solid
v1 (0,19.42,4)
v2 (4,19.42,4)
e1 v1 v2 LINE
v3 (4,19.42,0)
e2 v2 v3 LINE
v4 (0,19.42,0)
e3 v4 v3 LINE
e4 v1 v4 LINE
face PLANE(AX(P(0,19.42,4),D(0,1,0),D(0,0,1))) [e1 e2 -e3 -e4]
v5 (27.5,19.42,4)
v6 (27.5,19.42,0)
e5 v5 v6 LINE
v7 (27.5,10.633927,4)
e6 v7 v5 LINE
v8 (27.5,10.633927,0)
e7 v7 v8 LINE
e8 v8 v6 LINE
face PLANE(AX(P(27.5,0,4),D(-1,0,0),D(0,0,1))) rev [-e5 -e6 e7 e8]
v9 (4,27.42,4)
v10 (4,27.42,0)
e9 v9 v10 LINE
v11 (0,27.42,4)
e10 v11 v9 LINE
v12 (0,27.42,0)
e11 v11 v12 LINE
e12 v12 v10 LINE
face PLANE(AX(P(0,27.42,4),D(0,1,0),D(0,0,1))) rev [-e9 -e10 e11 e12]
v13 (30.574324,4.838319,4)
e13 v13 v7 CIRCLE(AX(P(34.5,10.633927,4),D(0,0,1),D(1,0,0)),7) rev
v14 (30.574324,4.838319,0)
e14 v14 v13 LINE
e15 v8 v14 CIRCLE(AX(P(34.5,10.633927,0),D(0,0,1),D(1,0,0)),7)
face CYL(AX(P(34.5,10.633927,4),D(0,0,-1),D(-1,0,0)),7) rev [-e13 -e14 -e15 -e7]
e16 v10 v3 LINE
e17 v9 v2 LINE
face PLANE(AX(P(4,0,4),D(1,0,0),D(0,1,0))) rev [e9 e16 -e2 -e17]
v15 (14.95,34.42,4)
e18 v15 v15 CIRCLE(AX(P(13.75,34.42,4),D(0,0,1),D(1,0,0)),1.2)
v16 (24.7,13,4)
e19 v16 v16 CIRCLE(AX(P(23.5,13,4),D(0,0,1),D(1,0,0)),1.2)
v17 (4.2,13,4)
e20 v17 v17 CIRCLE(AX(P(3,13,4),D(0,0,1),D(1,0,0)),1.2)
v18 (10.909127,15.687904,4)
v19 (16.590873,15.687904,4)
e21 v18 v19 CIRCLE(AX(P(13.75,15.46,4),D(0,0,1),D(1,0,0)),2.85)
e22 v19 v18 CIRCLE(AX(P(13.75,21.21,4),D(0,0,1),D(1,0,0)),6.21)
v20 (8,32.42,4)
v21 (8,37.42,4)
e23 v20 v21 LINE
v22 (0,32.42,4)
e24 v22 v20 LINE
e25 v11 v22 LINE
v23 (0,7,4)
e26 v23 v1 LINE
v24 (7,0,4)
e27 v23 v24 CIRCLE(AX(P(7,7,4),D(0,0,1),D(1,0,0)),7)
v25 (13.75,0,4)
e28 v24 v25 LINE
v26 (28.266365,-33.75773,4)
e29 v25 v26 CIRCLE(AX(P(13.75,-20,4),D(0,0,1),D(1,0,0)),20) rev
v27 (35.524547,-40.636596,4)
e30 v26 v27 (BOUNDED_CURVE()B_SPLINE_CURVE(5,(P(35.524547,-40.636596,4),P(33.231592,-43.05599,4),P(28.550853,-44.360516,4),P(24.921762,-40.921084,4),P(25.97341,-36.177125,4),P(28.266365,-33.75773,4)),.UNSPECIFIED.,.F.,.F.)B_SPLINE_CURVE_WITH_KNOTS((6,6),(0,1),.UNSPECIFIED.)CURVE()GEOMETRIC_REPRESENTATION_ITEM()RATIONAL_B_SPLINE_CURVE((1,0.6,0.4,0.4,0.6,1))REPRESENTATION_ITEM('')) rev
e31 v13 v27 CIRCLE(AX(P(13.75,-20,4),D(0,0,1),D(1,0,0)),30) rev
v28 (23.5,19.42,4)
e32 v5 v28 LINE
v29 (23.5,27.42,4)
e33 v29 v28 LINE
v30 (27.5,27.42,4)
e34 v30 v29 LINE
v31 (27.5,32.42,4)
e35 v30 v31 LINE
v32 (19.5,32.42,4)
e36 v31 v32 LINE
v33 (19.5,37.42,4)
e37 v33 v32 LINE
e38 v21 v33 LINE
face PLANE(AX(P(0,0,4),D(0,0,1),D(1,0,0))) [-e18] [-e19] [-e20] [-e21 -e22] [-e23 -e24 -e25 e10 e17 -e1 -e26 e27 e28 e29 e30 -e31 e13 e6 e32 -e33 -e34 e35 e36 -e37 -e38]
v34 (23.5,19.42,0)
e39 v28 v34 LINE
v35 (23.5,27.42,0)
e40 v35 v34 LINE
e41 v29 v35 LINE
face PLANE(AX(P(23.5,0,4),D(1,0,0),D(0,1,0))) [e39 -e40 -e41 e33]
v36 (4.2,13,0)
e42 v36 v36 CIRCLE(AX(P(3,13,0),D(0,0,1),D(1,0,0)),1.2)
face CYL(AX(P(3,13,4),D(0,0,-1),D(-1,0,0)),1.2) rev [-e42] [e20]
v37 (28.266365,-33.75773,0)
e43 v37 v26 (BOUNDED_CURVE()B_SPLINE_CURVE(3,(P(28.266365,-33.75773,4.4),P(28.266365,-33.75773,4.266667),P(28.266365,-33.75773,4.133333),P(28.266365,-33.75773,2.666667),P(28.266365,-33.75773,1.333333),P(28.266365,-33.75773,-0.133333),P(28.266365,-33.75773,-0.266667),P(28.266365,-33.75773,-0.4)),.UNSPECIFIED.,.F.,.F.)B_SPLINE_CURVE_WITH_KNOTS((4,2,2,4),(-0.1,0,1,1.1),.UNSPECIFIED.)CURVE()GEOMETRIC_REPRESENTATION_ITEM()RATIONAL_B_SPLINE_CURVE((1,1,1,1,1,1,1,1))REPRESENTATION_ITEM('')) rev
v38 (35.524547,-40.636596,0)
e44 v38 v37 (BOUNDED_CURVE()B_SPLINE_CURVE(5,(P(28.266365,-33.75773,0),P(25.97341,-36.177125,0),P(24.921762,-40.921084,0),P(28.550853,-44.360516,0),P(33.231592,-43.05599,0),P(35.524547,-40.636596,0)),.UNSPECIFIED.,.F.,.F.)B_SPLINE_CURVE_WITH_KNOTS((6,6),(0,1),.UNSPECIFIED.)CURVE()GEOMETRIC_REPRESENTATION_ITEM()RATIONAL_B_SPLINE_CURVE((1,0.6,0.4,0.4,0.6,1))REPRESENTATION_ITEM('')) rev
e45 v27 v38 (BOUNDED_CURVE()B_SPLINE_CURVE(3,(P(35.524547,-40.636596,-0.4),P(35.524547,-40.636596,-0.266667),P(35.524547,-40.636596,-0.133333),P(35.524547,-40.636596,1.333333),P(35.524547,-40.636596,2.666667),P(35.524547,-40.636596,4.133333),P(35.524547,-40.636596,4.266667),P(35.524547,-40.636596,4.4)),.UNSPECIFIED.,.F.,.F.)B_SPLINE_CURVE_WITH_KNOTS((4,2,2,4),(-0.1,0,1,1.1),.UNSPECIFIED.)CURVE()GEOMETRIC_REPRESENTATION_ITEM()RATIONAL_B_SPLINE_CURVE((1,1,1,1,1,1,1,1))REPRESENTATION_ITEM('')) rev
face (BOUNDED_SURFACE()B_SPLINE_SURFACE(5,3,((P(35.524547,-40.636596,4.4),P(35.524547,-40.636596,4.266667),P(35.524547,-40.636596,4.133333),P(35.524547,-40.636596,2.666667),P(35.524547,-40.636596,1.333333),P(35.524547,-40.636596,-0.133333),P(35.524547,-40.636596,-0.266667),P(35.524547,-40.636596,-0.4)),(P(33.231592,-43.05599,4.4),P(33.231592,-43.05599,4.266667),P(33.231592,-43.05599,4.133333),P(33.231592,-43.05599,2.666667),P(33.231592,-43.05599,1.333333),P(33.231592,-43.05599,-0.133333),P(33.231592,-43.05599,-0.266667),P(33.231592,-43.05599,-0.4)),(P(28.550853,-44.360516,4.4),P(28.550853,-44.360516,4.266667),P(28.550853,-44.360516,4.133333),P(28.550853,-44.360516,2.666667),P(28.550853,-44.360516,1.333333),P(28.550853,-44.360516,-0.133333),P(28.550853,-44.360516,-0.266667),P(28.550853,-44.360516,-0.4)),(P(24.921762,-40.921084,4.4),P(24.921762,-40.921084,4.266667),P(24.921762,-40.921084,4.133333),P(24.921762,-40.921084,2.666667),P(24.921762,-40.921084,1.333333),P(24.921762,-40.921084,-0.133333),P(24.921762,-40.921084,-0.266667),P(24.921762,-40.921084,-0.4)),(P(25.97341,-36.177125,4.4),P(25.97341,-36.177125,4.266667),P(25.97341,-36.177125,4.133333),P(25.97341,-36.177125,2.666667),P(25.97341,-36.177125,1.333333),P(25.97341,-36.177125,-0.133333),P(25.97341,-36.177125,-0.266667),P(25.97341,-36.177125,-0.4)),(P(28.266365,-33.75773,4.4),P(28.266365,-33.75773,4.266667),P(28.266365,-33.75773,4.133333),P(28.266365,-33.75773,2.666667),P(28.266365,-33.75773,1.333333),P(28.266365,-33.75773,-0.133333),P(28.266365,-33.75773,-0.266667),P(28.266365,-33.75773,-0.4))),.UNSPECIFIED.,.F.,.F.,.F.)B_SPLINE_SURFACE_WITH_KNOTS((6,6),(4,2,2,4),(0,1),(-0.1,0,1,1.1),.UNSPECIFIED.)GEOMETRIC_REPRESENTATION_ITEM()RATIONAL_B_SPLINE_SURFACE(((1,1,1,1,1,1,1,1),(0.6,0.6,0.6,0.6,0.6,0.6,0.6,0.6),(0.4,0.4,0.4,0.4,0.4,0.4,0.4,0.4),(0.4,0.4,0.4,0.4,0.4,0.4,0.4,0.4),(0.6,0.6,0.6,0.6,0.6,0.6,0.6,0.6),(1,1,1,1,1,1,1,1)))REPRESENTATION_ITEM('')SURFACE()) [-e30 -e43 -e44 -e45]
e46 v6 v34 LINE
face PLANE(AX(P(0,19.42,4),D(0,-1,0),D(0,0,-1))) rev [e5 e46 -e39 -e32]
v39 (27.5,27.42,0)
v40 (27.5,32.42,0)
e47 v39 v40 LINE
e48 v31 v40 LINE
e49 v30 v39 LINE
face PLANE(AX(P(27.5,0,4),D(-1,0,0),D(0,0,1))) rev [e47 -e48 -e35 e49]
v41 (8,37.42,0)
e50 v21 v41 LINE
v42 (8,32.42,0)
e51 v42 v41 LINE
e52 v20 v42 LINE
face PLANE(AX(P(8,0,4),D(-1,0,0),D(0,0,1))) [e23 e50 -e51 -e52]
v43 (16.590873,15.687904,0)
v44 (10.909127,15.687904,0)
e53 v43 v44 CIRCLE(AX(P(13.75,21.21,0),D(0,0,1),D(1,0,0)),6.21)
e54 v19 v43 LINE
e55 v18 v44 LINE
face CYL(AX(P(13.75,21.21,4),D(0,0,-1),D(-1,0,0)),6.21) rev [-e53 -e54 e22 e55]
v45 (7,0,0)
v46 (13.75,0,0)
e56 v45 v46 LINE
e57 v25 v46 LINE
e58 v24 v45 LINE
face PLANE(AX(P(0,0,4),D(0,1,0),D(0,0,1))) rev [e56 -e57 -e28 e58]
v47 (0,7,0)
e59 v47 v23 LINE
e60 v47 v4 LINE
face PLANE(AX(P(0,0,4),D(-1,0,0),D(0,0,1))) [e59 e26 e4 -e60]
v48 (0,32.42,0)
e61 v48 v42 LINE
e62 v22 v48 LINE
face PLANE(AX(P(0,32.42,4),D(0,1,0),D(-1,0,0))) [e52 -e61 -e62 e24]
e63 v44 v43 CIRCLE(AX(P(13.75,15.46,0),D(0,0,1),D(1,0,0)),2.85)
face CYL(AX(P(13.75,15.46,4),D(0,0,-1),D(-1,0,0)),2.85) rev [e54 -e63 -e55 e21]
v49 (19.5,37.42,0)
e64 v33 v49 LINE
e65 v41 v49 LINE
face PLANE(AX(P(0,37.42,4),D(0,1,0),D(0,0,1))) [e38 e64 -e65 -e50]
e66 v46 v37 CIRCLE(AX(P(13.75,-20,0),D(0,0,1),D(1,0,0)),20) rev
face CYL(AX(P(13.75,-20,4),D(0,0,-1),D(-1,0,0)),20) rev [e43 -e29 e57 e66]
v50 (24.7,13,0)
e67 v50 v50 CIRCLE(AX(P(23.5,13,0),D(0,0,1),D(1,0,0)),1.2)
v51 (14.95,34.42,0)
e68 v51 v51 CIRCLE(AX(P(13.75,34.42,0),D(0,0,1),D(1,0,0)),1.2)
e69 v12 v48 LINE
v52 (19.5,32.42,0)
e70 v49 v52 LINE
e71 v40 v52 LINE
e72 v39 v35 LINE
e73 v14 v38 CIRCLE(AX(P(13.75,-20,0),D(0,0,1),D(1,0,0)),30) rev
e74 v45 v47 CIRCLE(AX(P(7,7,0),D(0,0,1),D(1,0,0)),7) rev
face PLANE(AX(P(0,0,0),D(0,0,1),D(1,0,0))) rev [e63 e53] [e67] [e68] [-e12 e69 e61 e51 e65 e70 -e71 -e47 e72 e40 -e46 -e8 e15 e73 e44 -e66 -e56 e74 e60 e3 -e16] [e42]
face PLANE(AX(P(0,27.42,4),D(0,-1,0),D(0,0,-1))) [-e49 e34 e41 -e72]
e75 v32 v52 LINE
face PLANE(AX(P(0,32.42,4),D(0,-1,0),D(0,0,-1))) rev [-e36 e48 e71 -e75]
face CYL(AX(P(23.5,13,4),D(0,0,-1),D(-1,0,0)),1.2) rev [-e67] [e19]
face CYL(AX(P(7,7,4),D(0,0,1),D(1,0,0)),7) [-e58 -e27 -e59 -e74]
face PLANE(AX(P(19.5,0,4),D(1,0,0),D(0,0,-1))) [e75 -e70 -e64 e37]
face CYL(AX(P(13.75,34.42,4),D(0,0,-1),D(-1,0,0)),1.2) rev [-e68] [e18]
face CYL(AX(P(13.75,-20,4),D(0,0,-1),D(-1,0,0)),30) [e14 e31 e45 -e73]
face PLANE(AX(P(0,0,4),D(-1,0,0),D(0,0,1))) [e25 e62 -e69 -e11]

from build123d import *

# Parameters (mm, degrees)
SKETCH1_R           = 1.2
BOSS_EXTRUDE1_DEPTH = 4
FILLET1_R           = 7
FILLET2_START       = -1
FILLET2_DEPTH       = 6


with BuildPart() as part:
    # Sketch1 → Boss-Extrude1 (new body)
    with BuildSketch(Plane.XY):
        with BuildLine():
            Line((8, 37.42), (8, 32.42))
            Line((8, 32.42), (0, 32.42))
            Line((0, 32.42), (0, 27.42))
            Line((0, 27.42), (4, 27.42))
            Line((4, 27.42), (4, 19.42))
            Line((4, 19.42), (0, 19.42))
            Line((0, 19.42), (0, 0))
            Line((0, 0), (13.75, 0))
            ThreePointArc((13.75, 0), (32.824339015, -13.98588401), (25.221528727, -36.383040886))
            Line((25.221528727, -36.383040886), (30.957293091, -44.574561329))
            ThreePointArc((30.957293091, -44.574561329), (43.681938755, -17.980336071), (27.5, 6.66341126))
            Line((27.5, 6.66341126), (27.5, 19.42))
            Line((27.5, 19.42), (23.5, 19.42))
            Line((23.5, 19.42), (23.5, 27.42))
            Line((23.5, 27.42), (27.5, 27.42))
            Line((27.5, 27.42), (27.5, 32.42))
            Line((27.5, 32.42), (19.5, 32.42))
            Line((19.5, 32.42), (19.5, 37.42))
            Line((19.5, 37.42), (8, 37.42))
        make_face()
        with Locations((3, 13)):
            Circle(SKETCH1_R, mode=Mode.SUBTRACT)
        with BuildLine():
            ThreePointArc((16.590873036, 15.687904348), (13.75, 12.61), (10.909126964, 15.687904348))
            ThreePointArc((10.909126964, 15.687904348), (13.75, 27.42), (16.590873036, 15.687904348))
        make_face(mode=Mode.SUBTRACT)
        with Locations((13.75, 34.42)):
            Circle(SKETCH1_R, mode=Mode.SUBTRACT)
        with Locations((23.5, 13)):
            Circle(SKETCH1_R, mode=Mode.SUBTRACT)
    extrude(amount=BOSS_EXTRUDE1_DEPTH)

    # Fillet1
    fillet1_edges = [part.edges().sort_by_distance(p)[0] for p in [
        (27.5, 6.66341126, 2),
        (0, 0, 2),
    ]]
    fillet(fillet1_edges, radius=FILLET1_R)

    # Fillet2: read off the stored shape, not the designer's step
    # Fillet2 outline → Fillet2 (cut)
    with BuildSketch(Plane.XY.offset(FILLET2_START)):
        with BuildLine():
            ThreePointArc((30.957293091, -44.574561329), (33.340121642, -42.720632343), (35.524547437, -40.636595745))
            add(Edge.make_bspline(
                [(35.524547437, -40.636595745), (34.55329691, -41.661403369), (33.063664011, -42.522816758), (31.099164619, -42.770231906), (29.107575632, -41.932891027), (27.799695976, -40.065045303)],
                knots=[0, 0, 0, 0, 0, 0, 0.550510257, 0.550510257, 0.550510257, 0.550510257, 0.550510257, 0.550510257], degree=5, weights=[1, 0.779795897, 0.620204103, 0.521224617, 0.48285744, 0.505102572]))
            Line((27.799695976, -40.065045303), (30.957293091, -44.574561329))
        make_face()
        with BuildLine():
            Line((25.221528727, -36.383040886), (27.799695976, -40.065045303))
            add(Edge.make_bspline(
                [(27.799695976, -40.065045303), (26.814281677, -38.657727837), (26.550577461, -37.082538129), (26.869269697, -35.66327749), (27.512411311, -34.553258967), (28.266364958, -33.757730497)],
                knots=[0.550510257, 0.550510257, 0.550510257, 0.550510257, 0.550510257, 0.550510257, 1, 1, 1, 1, 1, 1], degree=5, weights=[0.505102572, 0.523265646, 0.581836926, 0.680816412, 0.820204103, 1]))
            ThreePointArc((28.266364958, -33.757730497), (26.810081095, -35.147088229), (25.221528727, -36.383040886))
        make_face()
    extrude(amount=FILLET2_DEPTH, mode=Mode.SUBTRACT)


solid = part.part
